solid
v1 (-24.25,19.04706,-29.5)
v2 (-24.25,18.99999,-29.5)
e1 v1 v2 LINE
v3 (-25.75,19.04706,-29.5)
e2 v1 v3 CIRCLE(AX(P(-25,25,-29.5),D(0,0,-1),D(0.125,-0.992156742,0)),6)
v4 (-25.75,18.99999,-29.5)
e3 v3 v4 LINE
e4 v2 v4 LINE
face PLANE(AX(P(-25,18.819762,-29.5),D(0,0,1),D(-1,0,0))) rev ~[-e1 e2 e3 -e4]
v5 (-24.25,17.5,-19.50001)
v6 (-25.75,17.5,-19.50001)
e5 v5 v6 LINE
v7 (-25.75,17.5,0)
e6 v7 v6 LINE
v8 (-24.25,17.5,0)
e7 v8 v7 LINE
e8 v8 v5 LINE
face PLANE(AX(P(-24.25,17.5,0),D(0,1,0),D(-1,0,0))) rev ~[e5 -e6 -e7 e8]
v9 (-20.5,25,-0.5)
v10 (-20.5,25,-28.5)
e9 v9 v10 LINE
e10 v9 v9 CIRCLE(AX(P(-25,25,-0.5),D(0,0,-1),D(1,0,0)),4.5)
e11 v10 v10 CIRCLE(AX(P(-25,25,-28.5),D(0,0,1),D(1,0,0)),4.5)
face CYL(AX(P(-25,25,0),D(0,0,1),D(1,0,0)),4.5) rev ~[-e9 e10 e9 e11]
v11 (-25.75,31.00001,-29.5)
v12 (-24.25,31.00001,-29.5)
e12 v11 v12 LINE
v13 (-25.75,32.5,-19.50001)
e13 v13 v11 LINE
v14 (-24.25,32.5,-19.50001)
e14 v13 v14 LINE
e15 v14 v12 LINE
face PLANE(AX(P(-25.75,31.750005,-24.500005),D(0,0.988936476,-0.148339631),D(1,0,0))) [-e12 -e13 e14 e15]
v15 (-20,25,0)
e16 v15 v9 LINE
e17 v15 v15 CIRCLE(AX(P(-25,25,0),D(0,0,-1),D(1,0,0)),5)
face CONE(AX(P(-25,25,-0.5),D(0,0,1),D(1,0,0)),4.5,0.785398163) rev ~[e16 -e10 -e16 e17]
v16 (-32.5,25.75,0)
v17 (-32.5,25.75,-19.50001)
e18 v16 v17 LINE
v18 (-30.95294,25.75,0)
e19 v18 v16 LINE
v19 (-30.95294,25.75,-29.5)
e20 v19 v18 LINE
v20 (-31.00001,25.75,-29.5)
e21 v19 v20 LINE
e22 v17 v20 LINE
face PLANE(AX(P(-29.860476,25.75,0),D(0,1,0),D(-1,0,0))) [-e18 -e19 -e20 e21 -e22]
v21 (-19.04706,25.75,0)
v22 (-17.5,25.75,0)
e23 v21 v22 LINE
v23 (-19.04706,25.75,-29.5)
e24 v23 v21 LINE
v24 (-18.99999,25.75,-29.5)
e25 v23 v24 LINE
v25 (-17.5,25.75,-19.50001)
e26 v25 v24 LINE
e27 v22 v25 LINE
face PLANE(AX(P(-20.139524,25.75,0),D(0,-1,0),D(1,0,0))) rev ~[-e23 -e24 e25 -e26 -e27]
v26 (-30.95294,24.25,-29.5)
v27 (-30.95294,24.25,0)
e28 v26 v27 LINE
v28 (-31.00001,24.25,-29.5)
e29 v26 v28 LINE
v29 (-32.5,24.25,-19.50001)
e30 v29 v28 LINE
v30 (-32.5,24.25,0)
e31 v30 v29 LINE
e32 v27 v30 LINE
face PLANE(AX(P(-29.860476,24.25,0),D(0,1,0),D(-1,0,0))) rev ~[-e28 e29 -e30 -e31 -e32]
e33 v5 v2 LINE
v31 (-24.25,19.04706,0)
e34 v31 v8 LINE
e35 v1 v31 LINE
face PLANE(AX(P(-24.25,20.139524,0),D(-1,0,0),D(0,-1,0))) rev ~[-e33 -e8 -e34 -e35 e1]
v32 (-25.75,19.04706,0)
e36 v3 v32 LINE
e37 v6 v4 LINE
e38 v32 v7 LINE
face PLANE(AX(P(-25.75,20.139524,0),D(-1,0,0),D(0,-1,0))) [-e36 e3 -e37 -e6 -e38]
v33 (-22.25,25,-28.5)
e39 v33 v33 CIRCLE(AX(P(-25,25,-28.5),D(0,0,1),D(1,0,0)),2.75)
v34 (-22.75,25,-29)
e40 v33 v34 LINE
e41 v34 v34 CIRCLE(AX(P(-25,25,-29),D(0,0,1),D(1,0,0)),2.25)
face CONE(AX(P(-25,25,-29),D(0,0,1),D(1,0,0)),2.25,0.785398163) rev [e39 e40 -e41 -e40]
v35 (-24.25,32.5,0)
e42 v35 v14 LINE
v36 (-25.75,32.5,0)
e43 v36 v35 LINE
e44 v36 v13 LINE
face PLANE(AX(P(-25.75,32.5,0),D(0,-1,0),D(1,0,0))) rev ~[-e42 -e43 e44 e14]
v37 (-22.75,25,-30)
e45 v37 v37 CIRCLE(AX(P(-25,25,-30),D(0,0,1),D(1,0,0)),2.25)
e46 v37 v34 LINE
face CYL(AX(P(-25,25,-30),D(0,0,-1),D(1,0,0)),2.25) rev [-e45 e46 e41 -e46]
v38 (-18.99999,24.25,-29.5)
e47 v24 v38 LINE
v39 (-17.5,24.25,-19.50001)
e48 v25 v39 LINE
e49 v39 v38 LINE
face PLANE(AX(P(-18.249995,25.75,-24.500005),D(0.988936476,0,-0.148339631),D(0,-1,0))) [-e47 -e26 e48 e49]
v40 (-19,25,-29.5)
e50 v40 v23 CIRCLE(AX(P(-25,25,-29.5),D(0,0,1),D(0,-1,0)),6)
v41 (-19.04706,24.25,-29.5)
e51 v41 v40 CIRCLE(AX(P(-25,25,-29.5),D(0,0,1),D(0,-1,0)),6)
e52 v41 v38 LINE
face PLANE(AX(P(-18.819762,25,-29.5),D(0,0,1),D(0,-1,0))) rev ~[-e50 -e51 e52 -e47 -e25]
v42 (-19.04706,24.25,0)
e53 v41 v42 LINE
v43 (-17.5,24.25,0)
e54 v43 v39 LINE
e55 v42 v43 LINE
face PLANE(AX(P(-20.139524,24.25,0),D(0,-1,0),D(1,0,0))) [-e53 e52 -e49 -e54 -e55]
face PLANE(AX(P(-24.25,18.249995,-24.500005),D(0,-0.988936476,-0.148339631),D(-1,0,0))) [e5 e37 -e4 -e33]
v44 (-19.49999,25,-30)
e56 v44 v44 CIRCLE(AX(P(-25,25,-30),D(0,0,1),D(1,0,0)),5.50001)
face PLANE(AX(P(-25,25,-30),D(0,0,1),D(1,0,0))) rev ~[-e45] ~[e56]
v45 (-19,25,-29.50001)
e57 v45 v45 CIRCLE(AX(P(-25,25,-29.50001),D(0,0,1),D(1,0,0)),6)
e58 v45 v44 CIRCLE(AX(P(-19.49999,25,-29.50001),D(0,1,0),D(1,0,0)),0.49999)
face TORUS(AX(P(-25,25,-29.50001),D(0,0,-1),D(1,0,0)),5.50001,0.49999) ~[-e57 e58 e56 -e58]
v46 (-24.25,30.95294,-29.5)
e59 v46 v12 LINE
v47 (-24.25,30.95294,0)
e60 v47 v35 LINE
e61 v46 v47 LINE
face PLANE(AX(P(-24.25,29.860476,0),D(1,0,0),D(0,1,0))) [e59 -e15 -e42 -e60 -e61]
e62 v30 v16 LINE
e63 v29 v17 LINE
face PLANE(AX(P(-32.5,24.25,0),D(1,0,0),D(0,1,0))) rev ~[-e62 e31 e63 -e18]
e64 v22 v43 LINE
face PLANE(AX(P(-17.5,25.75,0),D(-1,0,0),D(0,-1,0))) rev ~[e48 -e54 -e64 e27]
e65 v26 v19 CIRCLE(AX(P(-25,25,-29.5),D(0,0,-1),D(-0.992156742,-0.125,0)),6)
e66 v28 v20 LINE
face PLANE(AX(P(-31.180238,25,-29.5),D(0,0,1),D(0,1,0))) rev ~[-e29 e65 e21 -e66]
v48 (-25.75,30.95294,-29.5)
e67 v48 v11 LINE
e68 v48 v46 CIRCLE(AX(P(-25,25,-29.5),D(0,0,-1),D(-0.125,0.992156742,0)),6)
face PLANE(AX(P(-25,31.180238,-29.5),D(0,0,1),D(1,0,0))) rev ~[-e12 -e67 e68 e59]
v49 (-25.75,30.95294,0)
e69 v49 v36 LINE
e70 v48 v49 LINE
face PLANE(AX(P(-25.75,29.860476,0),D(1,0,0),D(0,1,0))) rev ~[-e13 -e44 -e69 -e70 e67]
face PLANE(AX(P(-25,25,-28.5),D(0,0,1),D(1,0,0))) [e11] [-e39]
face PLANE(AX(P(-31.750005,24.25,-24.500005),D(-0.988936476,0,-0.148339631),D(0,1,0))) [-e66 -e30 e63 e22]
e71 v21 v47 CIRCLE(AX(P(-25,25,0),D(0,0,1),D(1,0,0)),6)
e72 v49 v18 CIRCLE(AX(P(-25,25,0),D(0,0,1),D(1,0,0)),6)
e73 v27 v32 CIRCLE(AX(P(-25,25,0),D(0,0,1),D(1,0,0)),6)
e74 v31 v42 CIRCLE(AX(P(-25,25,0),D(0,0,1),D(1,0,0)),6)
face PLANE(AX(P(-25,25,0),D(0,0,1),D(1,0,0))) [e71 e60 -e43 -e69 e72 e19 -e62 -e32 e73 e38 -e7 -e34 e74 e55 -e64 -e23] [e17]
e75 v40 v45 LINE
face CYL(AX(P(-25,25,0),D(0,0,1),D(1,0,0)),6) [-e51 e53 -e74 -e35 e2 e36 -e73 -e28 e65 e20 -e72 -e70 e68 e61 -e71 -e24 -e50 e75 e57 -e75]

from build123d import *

# Parameters (mm, degrees)
F1_R        = 6
F1_R_2      = 4.5
F2_DEPTH    = 30
F4_W        = 1.5
F4_H        = 2.639524132
F5_DEPTH    = 29.5
F6_COUNT    = 4
F8_R        = 4.5
F8_R_2      = 2.25
F9_DEPTH    = 1.5
F10_SIZE2   = 1.49999
F10_SIZE    = 9.99999
F10_2_SIZE2 = 1.49999
F10_2_SIZE  = 9.99999
F10_3_SIZE2 = 1.49999
F10_3_SIZE  = 9.99999
F10_4_SIZE2 = 1.49999
F10_4_SIZE  = 9.99999
F11_SIZE    = 0.5
F12_R       = 0.49999


# Not quite as in the source:
# - a fillet or chamfer is up to 0.001 mm smaller than in the source, because OpenCascade refuses the exact size


with BuildPart() as f2:
    # F1 (on offset) → F2 (new body)
    with BuildSketch(Plane.XY):
        with Locations((-25, 25)):
            Circle(F1_R)
        with Locations((-25, 25)):
            Circle(F1_R_2, mode=Mode.SUBTRACT)
    extrude(amount=-F2_DEPTH)

    # F4 (on offset) → F5 (join)
    with BuildSketch(Plane.XY):
        with Locations((-25, 31.180237934)):
            Rectangle(F4_W, F4_H)
    extrude(amount=-F5_DEPTH)

    # F6: F2 ×4 about axis
    f6_axis = Axis((-25, 25, 0), (0, 0, 1))


with BuildPart() as f2_1:
    add(f2.part)
    for i in range(1, F6_COUNT):
        add(f2.part.rotate(f6_axis, i * 360 / F6_COUNT))

    # F8 (on offset) → F9 (join)
    with BuildSketch(Plane.XY.offset(-30)):
        with Locations((-25, 25)):
            Circle(F8_R)
        with Locations((-25, 25)):
            Circle(F8_R_2, mode=Mode.SUBTRACT)
    extrude(amount=F9_DEPTH)

    # F10 (size 10 and 1.5 in the source; OpenCascade refuses exactly that, so slightly less here)
    f10_edges = [f2_1.edges().sort_by_distance(p)[0] for p in [
        (-25, 17.5, -29.5),
    ]]
    f10_side = f2_1.faces().sort_by_distance((-25, 17.5, -14.75))[0]
    chamfer(f10_edges, length=F10_SIZE, length2=F10_SIZE2, reference=f10_side)

    # F10#2 (size 10 and 1.5 in the source; OpenCascade refuses exactly that, so slightly less here)
    f10_2_edges = [f2_1.edges().sort_by_distance(p)[0] for p in [
        (-17.5, 25, -29.5),
    ]]
    f10_2_side = f2_1.faces().sort_by_distance((-17.5, 25, -14.75))[0]
    chamfer(f10_2_edges, length=F10_2_SIZE, length2=F10_2_SIZE2, reference=f10_2_side)

    # F10#3 (size 10 and 1.5 in the source; OpenCascade refuses exactly that, so slightly less here)
    f10_3_edges = [f2_1.edges().sort_by_distance(p)[0] for p in [
        (-25, 32.5, -29.5),
    ]]
    f10_3_side = f2_1.faces().sort_by_distance((-25, 32.5, -14.75))[0]
    chamfer(f10_3_edges, length=F10_3_SIZE, length2=F10_3_SIZE2, reference=f10_3_side)

    # F10#4 (size 10 and 1.5 in the source; OpenCascade refuses exactly that, so slightly less here)
    f10_4_edges = [f2_1.edges().sort_by_distance(p)[0] for p in [
        (-32.5, 25, -29.5),
    ]]
    f10_4_side = f2_1.faces().sort_by_distance((-32.5, 25, -14.75))[0]
    chamfer(f10_4_edges, length=F10_4_SIZE, length2=F10_4_SIZE2, reference=f10_4_side)

    # F11
    f11_edges = [f2_1.edges().sort_by_distance(p)[0] for p in [
        (-29.5, 25, 0),
        (-27.25, 25, -28.5),
    ]]
    chamfer(f11_edges, length=F11_SIZE)

    # F12 (radius 0.5 in the source; OpenCascade refuses exactly that, so slightly less here)
    f12_edges = [f2_1.edges().sort_by_distance(p)[0] for p in [
        (-31, 25, -30),
    ]]
    fillet(f12_edges, radius=F12_R)


solid = f2_1.part
